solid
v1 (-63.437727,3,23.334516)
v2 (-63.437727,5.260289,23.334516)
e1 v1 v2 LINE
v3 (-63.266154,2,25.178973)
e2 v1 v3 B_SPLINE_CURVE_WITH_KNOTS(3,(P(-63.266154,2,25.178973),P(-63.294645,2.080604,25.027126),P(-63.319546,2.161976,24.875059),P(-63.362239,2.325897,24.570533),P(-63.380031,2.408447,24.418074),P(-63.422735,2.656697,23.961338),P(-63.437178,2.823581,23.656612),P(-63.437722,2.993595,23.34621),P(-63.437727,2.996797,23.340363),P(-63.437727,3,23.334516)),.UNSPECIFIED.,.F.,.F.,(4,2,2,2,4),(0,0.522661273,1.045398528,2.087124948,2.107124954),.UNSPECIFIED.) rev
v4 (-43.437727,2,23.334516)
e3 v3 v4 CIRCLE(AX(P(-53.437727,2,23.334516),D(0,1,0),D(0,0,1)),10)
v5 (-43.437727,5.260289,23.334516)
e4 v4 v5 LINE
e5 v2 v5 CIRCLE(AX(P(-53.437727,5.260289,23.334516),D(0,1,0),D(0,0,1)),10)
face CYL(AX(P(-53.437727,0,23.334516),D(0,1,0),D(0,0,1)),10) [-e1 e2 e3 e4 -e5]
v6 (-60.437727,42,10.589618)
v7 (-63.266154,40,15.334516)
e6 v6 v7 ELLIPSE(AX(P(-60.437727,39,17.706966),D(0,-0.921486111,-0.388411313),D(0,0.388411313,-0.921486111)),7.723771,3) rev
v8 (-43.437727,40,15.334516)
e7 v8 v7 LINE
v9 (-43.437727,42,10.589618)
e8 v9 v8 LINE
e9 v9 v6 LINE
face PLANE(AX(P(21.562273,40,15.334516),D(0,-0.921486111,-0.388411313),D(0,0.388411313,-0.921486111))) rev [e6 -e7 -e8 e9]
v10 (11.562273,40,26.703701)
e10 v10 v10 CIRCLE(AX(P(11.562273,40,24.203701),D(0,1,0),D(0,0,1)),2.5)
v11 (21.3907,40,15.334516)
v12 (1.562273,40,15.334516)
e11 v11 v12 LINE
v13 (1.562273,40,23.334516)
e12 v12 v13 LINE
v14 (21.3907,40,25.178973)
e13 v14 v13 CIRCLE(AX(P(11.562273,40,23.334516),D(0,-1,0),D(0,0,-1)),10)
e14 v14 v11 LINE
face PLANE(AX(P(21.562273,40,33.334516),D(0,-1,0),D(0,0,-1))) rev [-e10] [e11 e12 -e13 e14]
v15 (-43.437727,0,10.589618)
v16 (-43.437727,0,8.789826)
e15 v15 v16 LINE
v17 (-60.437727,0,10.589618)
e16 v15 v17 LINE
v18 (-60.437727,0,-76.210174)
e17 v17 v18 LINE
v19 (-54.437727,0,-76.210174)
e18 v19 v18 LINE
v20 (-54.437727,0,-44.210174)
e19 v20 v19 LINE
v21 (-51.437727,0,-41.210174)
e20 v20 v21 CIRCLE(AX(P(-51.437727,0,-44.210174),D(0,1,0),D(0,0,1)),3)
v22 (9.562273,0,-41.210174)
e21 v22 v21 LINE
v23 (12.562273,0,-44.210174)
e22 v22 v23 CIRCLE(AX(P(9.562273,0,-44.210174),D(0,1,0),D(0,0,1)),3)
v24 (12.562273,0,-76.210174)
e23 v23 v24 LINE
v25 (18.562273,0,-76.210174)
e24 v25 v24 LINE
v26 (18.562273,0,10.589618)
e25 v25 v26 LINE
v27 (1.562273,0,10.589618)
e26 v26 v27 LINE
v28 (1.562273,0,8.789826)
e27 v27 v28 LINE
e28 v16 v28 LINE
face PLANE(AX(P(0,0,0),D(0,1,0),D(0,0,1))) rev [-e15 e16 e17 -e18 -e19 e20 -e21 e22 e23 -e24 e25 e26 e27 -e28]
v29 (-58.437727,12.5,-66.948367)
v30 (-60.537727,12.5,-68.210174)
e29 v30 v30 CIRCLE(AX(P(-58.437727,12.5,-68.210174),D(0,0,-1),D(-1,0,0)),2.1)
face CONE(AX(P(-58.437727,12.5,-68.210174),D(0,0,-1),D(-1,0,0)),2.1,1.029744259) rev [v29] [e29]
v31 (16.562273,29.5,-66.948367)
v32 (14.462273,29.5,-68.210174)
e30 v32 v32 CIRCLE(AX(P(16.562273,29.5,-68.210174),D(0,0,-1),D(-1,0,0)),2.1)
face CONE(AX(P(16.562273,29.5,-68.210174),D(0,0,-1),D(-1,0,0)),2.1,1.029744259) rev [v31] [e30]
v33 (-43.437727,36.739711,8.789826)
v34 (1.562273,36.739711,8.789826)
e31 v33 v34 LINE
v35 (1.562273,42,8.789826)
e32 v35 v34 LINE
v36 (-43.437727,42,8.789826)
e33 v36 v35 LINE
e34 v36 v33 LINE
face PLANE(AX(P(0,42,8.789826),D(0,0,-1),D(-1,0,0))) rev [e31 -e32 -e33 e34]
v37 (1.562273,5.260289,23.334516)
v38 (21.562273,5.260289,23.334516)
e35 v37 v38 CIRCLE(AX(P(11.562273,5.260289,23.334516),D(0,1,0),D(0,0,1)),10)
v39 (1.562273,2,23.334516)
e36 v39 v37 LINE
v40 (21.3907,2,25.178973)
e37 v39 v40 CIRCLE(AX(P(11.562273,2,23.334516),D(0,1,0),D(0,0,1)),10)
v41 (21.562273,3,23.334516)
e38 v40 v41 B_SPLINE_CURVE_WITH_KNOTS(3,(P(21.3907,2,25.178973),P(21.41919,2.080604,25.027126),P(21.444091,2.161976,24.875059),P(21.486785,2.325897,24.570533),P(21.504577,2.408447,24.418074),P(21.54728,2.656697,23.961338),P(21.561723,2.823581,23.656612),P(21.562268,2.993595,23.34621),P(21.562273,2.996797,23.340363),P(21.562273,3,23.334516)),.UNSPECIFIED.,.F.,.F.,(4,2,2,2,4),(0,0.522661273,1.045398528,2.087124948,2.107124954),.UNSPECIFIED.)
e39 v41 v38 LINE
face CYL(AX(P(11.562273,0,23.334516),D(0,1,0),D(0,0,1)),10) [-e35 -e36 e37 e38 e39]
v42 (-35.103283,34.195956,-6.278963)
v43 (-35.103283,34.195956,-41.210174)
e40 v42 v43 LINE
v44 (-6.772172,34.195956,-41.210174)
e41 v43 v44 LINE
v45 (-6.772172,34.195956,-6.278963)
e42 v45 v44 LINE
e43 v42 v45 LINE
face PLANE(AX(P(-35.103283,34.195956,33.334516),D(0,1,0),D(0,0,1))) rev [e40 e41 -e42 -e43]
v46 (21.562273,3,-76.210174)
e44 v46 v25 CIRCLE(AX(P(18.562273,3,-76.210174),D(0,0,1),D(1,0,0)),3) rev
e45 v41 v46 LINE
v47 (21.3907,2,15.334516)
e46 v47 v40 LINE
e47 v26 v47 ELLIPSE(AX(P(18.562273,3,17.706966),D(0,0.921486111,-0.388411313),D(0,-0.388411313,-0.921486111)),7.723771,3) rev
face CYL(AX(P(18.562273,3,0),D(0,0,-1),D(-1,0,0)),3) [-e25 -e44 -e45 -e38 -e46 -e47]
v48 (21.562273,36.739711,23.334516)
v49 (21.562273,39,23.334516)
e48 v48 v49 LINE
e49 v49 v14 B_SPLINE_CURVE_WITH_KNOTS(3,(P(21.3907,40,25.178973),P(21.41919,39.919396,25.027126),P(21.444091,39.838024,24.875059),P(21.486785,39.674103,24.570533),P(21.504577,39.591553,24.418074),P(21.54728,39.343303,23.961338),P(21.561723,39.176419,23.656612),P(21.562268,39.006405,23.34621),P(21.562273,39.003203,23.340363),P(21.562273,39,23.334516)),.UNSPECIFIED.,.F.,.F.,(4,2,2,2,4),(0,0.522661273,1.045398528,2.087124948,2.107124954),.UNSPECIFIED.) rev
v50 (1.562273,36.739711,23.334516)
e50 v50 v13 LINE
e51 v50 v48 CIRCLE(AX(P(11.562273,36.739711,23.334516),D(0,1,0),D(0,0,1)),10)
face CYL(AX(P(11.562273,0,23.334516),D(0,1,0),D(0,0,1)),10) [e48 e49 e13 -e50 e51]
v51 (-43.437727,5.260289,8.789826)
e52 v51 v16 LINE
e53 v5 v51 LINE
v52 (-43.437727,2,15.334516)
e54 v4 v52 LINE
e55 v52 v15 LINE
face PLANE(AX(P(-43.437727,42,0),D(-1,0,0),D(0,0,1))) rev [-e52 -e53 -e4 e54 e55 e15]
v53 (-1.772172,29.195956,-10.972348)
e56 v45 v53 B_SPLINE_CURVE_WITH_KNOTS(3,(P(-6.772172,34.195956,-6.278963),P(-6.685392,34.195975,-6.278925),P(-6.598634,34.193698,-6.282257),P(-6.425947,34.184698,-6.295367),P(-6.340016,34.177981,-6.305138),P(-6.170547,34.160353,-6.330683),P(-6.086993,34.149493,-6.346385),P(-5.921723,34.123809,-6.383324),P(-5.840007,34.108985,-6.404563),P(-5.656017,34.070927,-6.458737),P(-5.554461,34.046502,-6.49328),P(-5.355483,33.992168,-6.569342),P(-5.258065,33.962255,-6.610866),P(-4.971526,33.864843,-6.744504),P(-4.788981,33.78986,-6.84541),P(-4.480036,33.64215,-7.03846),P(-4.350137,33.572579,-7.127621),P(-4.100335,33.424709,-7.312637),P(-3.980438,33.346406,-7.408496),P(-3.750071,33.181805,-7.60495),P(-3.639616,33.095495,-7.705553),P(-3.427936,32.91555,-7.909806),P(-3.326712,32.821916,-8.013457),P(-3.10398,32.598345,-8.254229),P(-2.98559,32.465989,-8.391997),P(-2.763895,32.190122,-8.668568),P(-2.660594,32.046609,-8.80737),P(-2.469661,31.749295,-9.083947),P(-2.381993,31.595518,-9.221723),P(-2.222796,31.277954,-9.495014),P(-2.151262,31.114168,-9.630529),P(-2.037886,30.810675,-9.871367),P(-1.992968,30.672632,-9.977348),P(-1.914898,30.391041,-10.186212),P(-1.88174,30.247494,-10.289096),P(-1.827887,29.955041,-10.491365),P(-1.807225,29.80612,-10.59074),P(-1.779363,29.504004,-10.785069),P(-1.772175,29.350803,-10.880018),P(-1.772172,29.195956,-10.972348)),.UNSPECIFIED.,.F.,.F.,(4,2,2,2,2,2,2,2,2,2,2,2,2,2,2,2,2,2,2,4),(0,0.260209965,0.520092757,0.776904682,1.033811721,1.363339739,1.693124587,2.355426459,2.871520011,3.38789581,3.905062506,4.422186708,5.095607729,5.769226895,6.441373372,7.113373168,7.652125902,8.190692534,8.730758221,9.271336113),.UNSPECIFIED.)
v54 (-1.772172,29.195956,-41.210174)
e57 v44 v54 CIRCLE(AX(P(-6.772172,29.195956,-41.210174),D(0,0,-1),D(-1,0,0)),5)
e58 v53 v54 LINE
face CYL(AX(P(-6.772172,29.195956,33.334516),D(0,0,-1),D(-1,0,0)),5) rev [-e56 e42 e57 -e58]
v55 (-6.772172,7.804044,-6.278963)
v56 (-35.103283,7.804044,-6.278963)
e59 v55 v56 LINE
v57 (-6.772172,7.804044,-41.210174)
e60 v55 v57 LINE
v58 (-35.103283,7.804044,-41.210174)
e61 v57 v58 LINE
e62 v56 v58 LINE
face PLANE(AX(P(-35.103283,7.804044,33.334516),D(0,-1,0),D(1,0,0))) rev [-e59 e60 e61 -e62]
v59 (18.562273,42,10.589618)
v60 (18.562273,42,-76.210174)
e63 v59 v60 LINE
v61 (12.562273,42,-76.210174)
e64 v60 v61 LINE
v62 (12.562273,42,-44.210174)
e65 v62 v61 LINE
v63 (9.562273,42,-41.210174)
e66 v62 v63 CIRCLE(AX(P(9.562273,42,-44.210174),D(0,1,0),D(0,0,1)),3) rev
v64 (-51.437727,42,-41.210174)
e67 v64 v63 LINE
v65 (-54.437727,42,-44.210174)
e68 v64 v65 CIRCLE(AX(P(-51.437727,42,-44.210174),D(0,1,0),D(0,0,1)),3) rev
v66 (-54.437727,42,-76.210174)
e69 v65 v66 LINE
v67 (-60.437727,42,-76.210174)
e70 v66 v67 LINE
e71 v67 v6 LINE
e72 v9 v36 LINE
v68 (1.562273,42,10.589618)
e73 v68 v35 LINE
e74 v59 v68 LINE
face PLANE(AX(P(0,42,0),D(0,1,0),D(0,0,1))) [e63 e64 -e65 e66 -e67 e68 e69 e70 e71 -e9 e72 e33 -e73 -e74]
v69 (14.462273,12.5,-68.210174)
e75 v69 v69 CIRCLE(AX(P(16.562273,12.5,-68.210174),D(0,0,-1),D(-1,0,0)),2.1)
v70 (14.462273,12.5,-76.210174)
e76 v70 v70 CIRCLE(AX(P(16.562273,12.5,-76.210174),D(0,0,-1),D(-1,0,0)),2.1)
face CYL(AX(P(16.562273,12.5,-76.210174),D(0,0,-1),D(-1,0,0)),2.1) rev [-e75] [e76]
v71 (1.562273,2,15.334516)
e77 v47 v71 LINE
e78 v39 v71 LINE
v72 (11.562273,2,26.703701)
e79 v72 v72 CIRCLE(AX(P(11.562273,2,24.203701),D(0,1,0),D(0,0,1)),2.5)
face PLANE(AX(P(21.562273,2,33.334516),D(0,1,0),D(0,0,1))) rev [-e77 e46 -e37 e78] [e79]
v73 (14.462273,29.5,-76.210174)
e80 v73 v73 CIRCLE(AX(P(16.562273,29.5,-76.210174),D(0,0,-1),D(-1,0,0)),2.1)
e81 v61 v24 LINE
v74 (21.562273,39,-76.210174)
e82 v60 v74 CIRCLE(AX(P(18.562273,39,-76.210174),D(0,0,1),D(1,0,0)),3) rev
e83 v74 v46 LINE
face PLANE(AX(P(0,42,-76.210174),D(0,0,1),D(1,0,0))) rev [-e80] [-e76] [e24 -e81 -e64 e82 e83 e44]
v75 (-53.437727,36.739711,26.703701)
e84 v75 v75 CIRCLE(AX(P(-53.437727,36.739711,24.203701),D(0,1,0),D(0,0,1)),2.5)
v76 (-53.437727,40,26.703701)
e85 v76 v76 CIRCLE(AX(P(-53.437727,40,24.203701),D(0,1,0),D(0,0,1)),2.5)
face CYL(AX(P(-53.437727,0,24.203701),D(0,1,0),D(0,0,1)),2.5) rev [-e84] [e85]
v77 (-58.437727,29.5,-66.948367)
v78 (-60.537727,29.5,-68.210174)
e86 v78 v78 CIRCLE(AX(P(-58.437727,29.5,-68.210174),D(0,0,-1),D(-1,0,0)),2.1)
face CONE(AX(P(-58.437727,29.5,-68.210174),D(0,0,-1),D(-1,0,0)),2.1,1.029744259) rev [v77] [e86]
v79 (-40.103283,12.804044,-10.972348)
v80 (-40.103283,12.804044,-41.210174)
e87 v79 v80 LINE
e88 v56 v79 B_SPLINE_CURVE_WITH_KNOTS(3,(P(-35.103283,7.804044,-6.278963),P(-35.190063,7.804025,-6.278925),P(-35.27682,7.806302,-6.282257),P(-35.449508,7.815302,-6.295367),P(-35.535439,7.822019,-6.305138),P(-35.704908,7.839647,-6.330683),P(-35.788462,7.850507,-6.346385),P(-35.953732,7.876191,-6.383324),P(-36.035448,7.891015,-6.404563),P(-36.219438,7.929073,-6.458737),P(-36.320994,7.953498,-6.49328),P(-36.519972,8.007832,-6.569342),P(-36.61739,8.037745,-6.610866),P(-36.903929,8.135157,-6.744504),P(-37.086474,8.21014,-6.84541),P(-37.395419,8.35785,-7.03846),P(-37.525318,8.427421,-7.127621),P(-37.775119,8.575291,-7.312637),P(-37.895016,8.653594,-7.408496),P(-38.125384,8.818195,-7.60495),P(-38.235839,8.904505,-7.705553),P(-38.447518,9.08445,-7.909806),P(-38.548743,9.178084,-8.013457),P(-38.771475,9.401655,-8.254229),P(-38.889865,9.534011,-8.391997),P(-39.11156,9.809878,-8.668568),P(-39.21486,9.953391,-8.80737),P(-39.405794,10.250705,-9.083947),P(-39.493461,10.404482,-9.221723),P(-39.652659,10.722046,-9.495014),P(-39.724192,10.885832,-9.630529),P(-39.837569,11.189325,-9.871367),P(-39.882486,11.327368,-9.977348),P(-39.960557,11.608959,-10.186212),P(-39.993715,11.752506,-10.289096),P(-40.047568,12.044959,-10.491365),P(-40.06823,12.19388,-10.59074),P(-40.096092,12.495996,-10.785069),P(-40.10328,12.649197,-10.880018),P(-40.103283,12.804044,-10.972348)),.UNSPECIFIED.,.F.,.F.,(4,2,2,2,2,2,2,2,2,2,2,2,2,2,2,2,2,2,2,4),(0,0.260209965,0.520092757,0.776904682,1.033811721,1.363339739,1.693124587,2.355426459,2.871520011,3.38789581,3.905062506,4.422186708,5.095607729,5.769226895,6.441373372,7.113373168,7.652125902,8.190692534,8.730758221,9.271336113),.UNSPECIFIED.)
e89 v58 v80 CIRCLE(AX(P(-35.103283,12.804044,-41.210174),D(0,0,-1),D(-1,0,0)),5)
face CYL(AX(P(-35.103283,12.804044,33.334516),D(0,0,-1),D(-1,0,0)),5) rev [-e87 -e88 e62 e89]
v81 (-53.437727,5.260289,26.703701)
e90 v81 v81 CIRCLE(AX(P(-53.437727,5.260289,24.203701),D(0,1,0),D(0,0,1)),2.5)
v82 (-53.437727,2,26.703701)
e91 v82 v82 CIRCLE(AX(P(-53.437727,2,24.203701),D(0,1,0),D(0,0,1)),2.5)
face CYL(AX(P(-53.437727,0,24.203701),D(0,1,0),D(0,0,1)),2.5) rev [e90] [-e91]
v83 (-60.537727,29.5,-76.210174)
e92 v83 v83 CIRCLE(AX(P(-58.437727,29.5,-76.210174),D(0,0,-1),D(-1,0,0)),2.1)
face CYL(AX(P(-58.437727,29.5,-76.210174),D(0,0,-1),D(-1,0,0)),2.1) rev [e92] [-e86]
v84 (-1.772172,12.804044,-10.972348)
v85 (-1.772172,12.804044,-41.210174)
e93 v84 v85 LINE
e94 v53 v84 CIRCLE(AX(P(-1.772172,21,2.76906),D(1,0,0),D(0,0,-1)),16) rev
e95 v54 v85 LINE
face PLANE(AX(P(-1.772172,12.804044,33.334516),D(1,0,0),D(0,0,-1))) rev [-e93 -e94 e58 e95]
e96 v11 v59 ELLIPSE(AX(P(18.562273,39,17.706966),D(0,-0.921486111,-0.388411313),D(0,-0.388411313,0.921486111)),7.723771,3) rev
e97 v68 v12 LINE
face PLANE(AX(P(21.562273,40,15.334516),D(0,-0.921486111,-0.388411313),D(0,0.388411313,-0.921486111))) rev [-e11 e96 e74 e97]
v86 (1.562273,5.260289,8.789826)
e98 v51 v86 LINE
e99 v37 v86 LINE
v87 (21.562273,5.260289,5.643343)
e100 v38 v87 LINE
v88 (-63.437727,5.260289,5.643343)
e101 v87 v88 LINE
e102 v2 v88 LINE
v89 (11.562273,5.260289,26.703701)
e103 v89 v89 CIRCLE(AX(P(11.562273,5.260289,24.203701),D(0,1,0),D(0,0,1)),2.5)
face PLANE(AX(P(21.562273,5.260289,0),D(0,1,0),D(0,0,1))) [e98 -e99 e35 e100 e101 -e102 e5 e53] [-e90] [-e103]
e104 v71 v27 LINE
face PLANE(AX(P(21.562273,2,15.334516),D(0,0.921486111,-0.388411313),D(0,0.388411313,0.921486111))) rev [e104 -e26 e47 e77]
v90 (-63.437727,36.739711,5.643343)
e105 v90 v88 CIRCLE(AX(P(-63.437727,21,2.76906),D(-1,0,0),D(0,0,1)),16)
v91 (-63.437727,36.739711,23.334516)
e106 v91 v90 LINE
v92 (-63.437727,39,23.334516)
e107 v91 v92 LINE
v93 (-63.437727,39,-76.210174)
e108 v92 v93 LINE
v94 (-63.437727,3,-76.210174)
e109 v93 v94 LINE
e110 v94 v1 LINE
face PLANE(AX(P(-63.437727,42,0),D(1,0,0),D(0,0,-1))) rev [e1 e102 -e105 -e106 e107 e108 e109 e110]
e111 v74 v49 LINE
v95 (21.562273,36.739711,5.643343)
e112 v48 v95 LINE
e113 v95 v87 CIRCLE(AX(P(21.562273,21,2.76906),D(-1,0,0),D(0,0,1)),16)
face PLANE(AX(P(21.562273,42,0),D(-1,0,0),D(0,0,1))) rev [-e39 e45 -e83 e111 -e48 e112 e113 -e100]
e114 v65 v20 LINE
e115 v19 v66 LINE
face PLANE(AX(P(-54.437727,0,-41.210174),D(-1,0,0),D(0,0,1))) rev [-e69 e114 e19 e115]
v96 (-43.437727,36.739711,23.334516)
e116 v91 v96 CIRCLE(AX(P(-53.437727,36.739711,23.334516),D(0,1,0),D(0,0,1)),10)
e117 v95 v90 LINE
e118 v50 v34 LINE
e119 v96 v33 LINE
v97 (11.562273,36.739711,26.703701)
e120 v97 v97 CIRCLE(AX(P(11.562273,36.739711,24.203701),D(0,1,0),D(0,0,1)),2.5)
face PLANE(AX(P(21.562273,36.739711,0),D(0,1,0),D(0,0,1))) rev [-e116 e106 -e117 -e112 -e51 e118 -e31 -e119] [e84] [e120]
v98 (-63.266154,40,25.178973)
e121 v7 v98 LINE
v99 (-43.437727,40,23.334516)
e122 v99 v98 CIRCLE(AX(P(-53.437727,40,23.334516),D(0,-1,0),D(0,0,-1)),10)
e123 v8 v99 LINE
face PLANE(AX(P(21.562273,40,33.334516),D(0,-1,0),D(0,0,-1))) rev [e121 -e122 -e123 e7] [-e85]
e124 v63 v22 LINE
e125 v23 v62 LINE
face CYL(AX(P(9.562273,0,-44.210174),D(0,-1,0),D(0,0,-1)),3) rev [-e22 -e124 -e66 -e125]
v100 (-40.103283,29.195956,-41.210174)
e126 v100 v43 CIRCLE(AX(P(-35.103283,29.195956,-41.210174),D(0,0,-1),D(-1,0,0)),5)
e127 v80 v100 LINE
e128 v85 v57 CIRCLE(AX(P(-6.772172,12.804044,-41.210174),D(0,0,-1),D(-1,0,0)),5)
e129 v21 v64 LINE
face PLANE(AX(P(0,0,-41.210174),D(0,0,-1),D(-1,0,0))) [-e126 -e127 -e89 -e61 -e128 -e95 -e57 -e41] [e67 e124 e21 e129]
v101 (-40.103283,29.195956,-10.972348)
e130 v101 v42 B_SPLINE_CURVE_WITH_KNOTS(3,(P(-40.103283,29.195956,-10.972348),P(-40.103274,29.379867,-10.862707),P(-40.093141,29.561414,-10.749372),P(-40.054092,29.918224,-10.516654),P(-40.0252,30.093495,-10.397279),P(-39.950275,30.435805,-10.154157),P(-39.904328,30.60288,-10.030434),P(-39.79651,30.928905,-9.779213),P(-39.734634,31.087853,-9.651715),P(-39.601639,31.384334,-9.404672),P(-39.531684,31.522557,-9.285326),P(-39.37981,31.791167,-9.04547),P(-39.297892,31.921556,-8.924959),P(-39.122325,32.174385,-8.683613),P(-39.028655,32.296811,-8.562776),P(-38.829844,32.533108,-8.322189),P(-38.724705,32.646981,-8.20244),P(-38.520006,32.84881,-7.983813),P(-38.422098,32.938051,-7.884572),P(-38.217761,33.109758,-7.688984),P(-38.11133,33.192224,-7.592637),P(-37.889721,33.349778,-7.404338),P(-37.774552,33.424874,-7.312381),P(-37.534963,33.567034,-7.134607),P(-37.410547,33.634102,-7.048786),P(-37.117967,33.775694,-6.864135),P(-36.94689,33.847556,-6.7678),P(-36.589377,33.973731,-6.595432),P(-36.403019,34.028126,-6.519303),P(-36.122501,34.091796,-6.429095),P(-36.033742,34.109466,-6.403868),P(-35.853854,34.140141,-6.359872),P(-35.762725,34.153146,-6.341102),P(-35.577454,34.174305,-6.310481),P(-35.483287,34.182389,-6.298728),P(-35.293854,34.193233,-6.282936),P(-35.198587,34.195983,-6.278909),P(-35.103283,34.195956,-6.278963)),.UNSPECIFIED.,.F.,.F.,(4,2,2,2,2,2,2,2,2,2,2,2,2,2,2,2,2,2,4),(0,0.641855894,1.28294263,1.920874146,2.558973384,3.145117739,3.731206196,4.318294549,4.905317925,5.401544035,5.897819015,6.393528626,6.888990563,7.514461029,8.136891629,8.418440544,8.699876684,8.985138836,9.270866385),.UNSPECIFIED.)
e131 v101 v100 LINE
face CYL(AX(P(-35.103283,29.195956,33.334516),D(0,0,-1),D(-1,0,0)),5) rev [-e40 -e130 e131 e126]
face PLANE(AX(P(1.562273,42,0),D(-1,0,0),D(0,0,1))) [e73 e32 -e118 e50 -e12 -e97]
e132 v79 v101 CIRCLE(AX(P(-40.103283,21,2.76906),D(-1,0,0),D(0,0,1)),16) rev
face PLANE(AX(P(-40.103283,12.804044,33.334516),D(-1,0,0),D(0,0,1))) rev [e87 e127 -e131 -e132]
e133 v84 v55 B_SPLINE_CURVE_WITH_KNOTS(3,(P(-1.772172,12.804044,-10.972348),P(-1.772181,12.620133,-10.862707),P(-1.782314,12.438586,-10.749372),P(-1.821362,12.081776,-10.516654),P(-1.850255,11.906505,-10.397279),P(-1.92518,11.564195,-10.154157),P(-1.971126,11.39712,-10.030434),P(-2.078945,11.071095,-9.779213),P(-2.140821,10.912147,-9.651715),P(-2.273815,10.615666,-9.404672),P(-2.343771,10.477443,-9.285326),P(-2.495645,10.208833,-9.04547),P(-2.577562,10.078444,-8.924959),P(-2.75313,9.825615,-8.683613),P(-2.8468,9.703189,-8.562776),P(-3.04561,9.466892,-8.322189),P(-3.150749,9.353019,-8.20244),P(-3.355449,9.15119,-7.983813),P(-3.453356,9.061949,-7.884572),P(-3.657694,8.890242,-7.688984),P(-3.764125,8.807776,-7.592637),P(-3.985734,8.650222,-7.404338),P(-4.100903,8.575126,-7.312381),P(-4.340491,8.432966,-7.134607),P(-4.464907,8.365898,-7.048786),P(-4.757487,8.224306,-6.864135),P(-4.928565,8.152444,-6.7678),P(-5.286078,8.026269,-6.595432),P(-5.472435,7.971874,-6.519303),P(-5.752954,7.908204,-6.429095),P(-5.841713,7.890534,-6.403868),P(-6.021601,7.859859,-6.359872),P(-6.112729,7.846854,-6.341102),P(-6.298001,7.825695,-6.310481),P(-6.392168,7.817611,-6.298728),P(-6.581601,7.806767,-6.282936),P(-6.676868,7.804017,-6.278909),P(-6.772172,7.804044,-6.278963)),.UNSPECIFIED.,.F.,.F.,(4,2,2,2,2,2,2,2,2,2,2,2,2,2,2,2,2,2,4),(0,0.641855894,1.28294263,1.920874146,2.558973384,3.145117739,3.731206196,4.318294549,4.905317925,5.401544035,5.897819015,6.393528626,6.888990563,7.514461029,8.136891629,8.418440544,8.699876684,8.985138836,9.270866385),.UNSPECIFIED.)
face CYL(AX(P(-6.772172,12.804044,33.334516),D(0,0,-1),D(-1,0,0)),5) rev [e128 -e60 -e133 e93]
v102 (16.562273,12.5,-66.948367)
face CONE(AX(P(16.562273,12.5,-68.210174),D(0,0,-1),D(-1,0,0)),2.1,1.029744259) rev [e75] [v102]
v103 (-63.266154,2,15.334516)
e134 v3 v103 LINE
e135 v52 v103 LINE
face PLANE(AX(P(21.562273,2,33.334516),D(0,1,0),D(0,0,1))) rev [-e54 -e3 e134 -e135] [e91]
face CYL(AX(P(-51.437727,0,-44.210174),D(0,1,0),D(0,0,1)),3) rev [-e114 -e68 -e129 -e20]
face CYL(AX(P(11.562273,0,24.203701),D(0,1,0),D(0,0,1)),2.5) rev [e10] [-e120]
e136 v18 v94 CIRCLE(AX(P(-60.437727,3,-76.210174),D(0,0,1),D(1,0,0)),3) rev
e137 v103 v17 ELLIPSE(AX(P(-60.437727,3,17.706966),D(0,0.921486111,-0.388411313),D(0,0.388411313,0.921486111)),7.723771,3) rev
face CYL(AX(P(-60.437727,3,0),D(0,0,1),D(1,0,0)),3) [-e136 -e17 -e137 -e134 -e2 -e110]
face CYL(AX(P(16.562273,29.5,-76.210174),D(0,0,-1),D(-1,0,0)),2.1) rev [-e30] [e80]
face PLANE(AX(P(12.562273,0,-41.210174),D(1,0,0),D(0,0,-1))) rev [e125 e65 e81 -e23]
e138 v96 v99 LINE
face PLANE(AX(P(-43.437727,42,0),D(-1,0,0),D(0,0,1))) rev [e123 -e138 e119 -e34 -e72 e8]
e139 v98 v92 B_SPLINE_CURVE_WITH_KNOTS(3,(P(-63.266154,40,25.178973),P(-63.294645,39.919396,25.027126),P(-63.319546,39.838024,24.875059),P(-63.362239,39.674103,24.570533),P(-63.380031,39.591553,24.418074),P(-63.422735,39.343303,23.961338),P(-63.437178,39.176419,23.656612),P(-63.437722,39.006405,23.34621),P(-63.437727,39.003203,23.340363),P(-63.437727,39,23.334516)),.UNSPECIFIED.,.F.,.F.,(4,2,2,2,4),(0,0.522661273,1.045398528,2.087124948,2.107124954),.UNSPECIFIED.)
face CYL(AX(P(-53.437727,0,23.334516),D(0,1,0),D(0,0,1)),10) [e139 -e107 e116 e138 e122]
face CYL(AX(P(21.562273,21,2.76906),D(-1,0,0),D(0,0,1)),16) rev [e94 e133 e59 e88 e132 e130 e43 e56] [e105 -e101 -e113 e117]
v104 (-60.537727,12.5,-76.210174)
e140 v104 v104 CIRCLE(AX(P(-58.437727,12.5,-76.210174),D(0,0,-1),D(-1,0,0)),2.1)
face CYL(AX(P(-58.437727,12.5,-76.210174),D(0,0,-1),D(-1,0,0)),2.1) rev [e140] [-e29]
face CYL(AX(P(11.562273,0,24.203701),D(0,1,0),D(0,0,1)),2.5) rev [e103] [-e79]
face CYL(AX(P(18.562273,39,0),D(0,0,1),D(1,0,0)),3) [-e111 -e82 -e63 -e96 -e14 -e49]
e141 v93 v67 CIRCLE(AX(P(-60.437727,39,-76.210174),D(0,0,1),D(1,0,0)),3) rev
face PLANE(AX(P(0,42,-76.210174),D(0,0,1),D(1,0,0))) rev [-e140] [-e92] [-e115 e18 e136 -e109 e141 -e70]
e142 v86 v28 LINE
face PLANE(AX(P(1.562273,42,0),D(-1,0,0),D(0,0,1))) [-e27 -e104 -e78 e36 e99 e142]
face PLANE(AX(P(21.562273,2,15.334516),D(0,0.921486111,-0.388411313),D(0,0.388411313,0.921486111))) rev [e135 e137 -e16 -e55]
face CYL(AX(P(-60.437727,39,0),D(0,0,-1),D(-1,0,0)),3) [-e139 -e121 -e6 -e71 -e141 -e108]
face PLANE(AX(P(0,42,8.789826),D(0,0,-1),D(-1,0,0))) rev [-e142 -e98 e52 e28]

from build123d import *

# Parameters (mm, degrees)
SKETCH1_W               = 85
SKETCH1_H               = 85
SKETCH1_W_2             = 20
SKETCH1_H_2             = 25
BOSS_EXTRUDE1_DEPTH     = 42
CUT_EXTRUDE1_DEPTH      = 108.686284851
CUT_EXTRUDE2_DEPTH      = 122.642881801
CUT_EXTRUDE3_START      = -85
CUT_EXTRUDE3_DEPTH      = 85
SKETCH6_W               = 67
SKETCH6_H               = 42
CUT_EXTRUDE4_DEPTH      = 35
FILLET1_R               = 3
FILLET2_R               = 3
CUT_EXTRUDE6_DEPTH      = 107.514112815
CUT_EXTRUDE6_DEPTH_BACK = 107.514112815
M5_TAPPED_HOLE2_D       = 4.2
M5_TAPPED_HOLE2_DEPTH   = 8
M5_TAPPED_HOLE2_TIP     = 1.2618073
SKETCH17_R              = 2.5
CUT_EXTRUDE7_DEPTH      = 107.922102397


# Read off the part's stored shape, not the designer's step: Cut-Extrude3
with BuildPart() as part:
    # Sketch1 → Boss-Extrude1 (new body)
    with BuildSketch(Plane(origin=(0, 0, 0), x_dir=(1, 0, 0), z_dir=(0, 1, 0))):
        with Locations((-20.937727355, 33.710174471)):
            Rectangle(SKETCH1_W, SKETCH1_H)
        with Locations((-53.437727355, -21.289825529)):
            Rectangle(SKETCH1_W_2, SKETCH1_H_2)
        with Locations((11.562272645, -21.289825529)):
            Rectangle(SKETCH1_W_2, SKETCH1_H_2)
    extrude(amount=BOSS_EXTRUDE1_DEPTH)

    # Sketch2 → Cut-Extrude1 (cut, through all)
    with BuildSketch(Plane(origin=(0, 42, 0), x_dir=(1, 0, 0), z_dir=(0, 1, 0))):
        with BuildLine():
            Line((-63.437727355, -23.334516424), (-63.437727355, -33.789825529))
            Line((-63.437727355, -33.789825529), (-43.437727355, -33.789825529))
            Line((-43.437727355, -33.789825529), (-43.437727355, -23.334516424))
            ThreePointArc((-43.437727355, -23.334516424), (-53.437727355, -33.334516424), (-63.437727355, -23.334516424))
        make_face()
        with BuildLine():
            Line((1.562272645, -23.334516424), (1.562272645, -33.789825529))
            Line((1.562272645, -33.789825529), (21.562272645, -33.789825529))
            Line((21.562272645, -33.789825529), (21.562272645, -23.334516424))
            ThreePointArc((21.562272645, -23.334516424), (11.562272645, -33.334516424), (1.562272645, -23.334516424))
        make_face()
    extrude(amount=-CUT_EXTRUDE1_DEPTH, mode=Mode.SUBTRACT)

    # Sketch3 → Cut-Extrude2 (cut, through all)
    with BuildSketch(Plane.ZY.offset(63.437727355)):
        Polygon((33.334516424, 2), (15.334516424, 2), (10.589618013, 0), (33.334516424, 0), align=None)
        Polygon((15.334516424, 40), (10.589618013, 42), (33.334516424, 42), (33.334516424, 40), align=None)
    extrude(amount=-CUT_EXTRUDE2_DEPTH, mode=Mode.SUBTRACT)

    # Cut-Extrude3 outline → Cut-Extrude3 (cut)
    with BuildSketch(Plane.ZY.offset(63.437727355).offset(CUT_EXTRUDE3_START)):
        with BuildLine():
            Line((33.334516424, 5.260289026), (33.334516424, 36.739710974))
            Line((33.334516424, 36.739710974), (5.643342669, 36.739710974))
            ThreePointArc((5.643342669, 36.739710974), (-13.23093958, 21), (5.643342669, 5.260289026))
            Line((5.643342669, 5.260289026), (33.334516424, 5.260289026))
        make_face()
    extrude(amount=CUT_EXTRUDE3_DEPTH, mode=Mode.SUBTRACT)

    # Sketch6 → Cut-Extrude4 (cut)
    with BuildSketch(Plane(origin=(0, 0, -76.210174471), x_dir=(-1, 0, 0), z_dir=(0, 0, -1))):
        with Locations((20.937727355, 21)):
            Rectangle(SKETCH6_W, SKETCH6_H)
    extrude(amount=-CUT_EXTRUDE4_DEPTH, mode=Mode.SUBTRACT)

    # Fillet1
    # the kernel refuses this fillet: 3 mm, written as the material it takes off along each edge
    with BuildSketch(Plane(origin=(-63.437727355, 42, -94.210174471), x_dir=(1, 0, 0), z_dir=(0, 0, 1)), Plane(origin=(-63.437727355, 0, 28.589618013), x_dir=(1, 0, 0), z_dir=(0, 0, -1)), Plane(origin=(21.562272645, 42, -94.210174471), x_dir=(0, -1, 0), z_dir=(0, 0, 1)), Plane(origin=(21.562272645, 0, 28.589618013), x_dir=(0, 1, 0), z_dir=(0, 0, -1))) as fillet1_piece_1:
        with BuildLine():
            CenterArc((FILLET1_R, -FILLET1_R), FILLET1_R, 90, 90)
            Line((0, -FILLET1_R), (-FILLET1_R * 0.02, -FILLET1_R))
            Line((-FILLET1_R * 0.02, -FILLET1_R), (-FILLET1_R * 0.02, FILLET1_R * 0.02))
            Line((-FILLET1_R * 0.02, FILLET1_R * 0.02), (FILLET1_R, FILLET1_R * 0.02))
            Line((FILLET1_R, FILLET1_R * 0.02), (FILLET1_R, 0))
        make_face()
    extrude(amount=122.799792484, mode=Mode.SUBTRACT)

    # Fillet2
    fillet2_edges = [part.edges().sort_by_distance(p)[0] for p in [
        (12.562272645, 21, -41.210174471),
        (-54.437727355, 21, -41.210174471),
    ]]
    fillet(fillet2_edges, radius=FILLET2_R)

    # Sketch9 → Cut-Extrude6 (cut, two sides: drawn at the far end of the back side and taken through both)
    with BuildSketch(Plane(origin=(0, 0, -41.210174471), x_dir=(-1, 0, 0), z_dir=(0, 0, -1)).offset(-CUT_EXTRUDE6_DEPTH_BACK)):
        with BuildLine():
            Line((35.10328306, 7.804043613), (6.77217165, 7.804043613))
            ThreePointArc((6.77217165, 7.804043613), (3.236637744, 9.268509707), (1.77217165, 12.804043613))
            Line((1.77217165, 12.804043613), (1.77217165, 29.195956387))
            ThreePointArc((1.77217165, 29.195956387), (3.236637744, 32.731490293), (6.77217165, 34.195956387))
            Line((6.77217165, 34.195956387), (35.10328306, 34.195956387))
            ThreePointArc((35.10328306, 34.195956387), (38.638816966, 32.731490293), (40.10328306, 29.195956387))
            Line((40.10328306, 29.195956387), (40.10328306, 12.804043613))
            ThreePointArc((40.10328306, 12.804043613), (38.638816966, 9.268509707), (35.10328306, 7.804043613))
        make_face()
    extrude(amount=CUT_EXTRUDE6_DEPTH + CUT_EXTRUDE6_DEPTH_BACK, mode=Mode.SUBTRACT)

    # M5 Tapped Hole2
    with Locations(Plane(origin=(16.562272645, 29.5, -76.210174471), x_dir=(-1, 0, 0), z_dir=(0, 0, -1))):
        with Locations((0, 0), (0, -17), (75, -17), (75, 0)):
            Hole(M5_TAPPED_HOLE2_D / 2, depth=M5_TAPPED_HOLE2_DEPTH)
            with Locations((0, 0, -(M5_TAPPED_HOLE2_DEPTH + M5_TAPPED_HOLE2_TIP / 2))):  # 118° drill point
                Cone(0, M5_TAPPED_HOLE2_D / 2, M5_TAPPED_HOLE2_TIP, mode=Mode.SUBTRACT)

    # Sketch17 → Cut-Extrude7 (cut, through all)
    with BuildSketch(Plane(origin=(0, 40, 0), x_dir=(1, 0, 0), z_dir=(0, 1, 0))):
        with Locations(Location((-53.437727355, -24.203700837, 0), (0, 0, 270))):
            Circle(SKETCH17_R)
        with Locations(Location((11.562272645, -24.203700837, 0), (0, 0, 270))):
            Circle(SKETCH17_R)
    extrude(amount=-CUT_EXTRUDE7_DEPTH, mode=Mode.SUBTRACT)


solid = part.part
